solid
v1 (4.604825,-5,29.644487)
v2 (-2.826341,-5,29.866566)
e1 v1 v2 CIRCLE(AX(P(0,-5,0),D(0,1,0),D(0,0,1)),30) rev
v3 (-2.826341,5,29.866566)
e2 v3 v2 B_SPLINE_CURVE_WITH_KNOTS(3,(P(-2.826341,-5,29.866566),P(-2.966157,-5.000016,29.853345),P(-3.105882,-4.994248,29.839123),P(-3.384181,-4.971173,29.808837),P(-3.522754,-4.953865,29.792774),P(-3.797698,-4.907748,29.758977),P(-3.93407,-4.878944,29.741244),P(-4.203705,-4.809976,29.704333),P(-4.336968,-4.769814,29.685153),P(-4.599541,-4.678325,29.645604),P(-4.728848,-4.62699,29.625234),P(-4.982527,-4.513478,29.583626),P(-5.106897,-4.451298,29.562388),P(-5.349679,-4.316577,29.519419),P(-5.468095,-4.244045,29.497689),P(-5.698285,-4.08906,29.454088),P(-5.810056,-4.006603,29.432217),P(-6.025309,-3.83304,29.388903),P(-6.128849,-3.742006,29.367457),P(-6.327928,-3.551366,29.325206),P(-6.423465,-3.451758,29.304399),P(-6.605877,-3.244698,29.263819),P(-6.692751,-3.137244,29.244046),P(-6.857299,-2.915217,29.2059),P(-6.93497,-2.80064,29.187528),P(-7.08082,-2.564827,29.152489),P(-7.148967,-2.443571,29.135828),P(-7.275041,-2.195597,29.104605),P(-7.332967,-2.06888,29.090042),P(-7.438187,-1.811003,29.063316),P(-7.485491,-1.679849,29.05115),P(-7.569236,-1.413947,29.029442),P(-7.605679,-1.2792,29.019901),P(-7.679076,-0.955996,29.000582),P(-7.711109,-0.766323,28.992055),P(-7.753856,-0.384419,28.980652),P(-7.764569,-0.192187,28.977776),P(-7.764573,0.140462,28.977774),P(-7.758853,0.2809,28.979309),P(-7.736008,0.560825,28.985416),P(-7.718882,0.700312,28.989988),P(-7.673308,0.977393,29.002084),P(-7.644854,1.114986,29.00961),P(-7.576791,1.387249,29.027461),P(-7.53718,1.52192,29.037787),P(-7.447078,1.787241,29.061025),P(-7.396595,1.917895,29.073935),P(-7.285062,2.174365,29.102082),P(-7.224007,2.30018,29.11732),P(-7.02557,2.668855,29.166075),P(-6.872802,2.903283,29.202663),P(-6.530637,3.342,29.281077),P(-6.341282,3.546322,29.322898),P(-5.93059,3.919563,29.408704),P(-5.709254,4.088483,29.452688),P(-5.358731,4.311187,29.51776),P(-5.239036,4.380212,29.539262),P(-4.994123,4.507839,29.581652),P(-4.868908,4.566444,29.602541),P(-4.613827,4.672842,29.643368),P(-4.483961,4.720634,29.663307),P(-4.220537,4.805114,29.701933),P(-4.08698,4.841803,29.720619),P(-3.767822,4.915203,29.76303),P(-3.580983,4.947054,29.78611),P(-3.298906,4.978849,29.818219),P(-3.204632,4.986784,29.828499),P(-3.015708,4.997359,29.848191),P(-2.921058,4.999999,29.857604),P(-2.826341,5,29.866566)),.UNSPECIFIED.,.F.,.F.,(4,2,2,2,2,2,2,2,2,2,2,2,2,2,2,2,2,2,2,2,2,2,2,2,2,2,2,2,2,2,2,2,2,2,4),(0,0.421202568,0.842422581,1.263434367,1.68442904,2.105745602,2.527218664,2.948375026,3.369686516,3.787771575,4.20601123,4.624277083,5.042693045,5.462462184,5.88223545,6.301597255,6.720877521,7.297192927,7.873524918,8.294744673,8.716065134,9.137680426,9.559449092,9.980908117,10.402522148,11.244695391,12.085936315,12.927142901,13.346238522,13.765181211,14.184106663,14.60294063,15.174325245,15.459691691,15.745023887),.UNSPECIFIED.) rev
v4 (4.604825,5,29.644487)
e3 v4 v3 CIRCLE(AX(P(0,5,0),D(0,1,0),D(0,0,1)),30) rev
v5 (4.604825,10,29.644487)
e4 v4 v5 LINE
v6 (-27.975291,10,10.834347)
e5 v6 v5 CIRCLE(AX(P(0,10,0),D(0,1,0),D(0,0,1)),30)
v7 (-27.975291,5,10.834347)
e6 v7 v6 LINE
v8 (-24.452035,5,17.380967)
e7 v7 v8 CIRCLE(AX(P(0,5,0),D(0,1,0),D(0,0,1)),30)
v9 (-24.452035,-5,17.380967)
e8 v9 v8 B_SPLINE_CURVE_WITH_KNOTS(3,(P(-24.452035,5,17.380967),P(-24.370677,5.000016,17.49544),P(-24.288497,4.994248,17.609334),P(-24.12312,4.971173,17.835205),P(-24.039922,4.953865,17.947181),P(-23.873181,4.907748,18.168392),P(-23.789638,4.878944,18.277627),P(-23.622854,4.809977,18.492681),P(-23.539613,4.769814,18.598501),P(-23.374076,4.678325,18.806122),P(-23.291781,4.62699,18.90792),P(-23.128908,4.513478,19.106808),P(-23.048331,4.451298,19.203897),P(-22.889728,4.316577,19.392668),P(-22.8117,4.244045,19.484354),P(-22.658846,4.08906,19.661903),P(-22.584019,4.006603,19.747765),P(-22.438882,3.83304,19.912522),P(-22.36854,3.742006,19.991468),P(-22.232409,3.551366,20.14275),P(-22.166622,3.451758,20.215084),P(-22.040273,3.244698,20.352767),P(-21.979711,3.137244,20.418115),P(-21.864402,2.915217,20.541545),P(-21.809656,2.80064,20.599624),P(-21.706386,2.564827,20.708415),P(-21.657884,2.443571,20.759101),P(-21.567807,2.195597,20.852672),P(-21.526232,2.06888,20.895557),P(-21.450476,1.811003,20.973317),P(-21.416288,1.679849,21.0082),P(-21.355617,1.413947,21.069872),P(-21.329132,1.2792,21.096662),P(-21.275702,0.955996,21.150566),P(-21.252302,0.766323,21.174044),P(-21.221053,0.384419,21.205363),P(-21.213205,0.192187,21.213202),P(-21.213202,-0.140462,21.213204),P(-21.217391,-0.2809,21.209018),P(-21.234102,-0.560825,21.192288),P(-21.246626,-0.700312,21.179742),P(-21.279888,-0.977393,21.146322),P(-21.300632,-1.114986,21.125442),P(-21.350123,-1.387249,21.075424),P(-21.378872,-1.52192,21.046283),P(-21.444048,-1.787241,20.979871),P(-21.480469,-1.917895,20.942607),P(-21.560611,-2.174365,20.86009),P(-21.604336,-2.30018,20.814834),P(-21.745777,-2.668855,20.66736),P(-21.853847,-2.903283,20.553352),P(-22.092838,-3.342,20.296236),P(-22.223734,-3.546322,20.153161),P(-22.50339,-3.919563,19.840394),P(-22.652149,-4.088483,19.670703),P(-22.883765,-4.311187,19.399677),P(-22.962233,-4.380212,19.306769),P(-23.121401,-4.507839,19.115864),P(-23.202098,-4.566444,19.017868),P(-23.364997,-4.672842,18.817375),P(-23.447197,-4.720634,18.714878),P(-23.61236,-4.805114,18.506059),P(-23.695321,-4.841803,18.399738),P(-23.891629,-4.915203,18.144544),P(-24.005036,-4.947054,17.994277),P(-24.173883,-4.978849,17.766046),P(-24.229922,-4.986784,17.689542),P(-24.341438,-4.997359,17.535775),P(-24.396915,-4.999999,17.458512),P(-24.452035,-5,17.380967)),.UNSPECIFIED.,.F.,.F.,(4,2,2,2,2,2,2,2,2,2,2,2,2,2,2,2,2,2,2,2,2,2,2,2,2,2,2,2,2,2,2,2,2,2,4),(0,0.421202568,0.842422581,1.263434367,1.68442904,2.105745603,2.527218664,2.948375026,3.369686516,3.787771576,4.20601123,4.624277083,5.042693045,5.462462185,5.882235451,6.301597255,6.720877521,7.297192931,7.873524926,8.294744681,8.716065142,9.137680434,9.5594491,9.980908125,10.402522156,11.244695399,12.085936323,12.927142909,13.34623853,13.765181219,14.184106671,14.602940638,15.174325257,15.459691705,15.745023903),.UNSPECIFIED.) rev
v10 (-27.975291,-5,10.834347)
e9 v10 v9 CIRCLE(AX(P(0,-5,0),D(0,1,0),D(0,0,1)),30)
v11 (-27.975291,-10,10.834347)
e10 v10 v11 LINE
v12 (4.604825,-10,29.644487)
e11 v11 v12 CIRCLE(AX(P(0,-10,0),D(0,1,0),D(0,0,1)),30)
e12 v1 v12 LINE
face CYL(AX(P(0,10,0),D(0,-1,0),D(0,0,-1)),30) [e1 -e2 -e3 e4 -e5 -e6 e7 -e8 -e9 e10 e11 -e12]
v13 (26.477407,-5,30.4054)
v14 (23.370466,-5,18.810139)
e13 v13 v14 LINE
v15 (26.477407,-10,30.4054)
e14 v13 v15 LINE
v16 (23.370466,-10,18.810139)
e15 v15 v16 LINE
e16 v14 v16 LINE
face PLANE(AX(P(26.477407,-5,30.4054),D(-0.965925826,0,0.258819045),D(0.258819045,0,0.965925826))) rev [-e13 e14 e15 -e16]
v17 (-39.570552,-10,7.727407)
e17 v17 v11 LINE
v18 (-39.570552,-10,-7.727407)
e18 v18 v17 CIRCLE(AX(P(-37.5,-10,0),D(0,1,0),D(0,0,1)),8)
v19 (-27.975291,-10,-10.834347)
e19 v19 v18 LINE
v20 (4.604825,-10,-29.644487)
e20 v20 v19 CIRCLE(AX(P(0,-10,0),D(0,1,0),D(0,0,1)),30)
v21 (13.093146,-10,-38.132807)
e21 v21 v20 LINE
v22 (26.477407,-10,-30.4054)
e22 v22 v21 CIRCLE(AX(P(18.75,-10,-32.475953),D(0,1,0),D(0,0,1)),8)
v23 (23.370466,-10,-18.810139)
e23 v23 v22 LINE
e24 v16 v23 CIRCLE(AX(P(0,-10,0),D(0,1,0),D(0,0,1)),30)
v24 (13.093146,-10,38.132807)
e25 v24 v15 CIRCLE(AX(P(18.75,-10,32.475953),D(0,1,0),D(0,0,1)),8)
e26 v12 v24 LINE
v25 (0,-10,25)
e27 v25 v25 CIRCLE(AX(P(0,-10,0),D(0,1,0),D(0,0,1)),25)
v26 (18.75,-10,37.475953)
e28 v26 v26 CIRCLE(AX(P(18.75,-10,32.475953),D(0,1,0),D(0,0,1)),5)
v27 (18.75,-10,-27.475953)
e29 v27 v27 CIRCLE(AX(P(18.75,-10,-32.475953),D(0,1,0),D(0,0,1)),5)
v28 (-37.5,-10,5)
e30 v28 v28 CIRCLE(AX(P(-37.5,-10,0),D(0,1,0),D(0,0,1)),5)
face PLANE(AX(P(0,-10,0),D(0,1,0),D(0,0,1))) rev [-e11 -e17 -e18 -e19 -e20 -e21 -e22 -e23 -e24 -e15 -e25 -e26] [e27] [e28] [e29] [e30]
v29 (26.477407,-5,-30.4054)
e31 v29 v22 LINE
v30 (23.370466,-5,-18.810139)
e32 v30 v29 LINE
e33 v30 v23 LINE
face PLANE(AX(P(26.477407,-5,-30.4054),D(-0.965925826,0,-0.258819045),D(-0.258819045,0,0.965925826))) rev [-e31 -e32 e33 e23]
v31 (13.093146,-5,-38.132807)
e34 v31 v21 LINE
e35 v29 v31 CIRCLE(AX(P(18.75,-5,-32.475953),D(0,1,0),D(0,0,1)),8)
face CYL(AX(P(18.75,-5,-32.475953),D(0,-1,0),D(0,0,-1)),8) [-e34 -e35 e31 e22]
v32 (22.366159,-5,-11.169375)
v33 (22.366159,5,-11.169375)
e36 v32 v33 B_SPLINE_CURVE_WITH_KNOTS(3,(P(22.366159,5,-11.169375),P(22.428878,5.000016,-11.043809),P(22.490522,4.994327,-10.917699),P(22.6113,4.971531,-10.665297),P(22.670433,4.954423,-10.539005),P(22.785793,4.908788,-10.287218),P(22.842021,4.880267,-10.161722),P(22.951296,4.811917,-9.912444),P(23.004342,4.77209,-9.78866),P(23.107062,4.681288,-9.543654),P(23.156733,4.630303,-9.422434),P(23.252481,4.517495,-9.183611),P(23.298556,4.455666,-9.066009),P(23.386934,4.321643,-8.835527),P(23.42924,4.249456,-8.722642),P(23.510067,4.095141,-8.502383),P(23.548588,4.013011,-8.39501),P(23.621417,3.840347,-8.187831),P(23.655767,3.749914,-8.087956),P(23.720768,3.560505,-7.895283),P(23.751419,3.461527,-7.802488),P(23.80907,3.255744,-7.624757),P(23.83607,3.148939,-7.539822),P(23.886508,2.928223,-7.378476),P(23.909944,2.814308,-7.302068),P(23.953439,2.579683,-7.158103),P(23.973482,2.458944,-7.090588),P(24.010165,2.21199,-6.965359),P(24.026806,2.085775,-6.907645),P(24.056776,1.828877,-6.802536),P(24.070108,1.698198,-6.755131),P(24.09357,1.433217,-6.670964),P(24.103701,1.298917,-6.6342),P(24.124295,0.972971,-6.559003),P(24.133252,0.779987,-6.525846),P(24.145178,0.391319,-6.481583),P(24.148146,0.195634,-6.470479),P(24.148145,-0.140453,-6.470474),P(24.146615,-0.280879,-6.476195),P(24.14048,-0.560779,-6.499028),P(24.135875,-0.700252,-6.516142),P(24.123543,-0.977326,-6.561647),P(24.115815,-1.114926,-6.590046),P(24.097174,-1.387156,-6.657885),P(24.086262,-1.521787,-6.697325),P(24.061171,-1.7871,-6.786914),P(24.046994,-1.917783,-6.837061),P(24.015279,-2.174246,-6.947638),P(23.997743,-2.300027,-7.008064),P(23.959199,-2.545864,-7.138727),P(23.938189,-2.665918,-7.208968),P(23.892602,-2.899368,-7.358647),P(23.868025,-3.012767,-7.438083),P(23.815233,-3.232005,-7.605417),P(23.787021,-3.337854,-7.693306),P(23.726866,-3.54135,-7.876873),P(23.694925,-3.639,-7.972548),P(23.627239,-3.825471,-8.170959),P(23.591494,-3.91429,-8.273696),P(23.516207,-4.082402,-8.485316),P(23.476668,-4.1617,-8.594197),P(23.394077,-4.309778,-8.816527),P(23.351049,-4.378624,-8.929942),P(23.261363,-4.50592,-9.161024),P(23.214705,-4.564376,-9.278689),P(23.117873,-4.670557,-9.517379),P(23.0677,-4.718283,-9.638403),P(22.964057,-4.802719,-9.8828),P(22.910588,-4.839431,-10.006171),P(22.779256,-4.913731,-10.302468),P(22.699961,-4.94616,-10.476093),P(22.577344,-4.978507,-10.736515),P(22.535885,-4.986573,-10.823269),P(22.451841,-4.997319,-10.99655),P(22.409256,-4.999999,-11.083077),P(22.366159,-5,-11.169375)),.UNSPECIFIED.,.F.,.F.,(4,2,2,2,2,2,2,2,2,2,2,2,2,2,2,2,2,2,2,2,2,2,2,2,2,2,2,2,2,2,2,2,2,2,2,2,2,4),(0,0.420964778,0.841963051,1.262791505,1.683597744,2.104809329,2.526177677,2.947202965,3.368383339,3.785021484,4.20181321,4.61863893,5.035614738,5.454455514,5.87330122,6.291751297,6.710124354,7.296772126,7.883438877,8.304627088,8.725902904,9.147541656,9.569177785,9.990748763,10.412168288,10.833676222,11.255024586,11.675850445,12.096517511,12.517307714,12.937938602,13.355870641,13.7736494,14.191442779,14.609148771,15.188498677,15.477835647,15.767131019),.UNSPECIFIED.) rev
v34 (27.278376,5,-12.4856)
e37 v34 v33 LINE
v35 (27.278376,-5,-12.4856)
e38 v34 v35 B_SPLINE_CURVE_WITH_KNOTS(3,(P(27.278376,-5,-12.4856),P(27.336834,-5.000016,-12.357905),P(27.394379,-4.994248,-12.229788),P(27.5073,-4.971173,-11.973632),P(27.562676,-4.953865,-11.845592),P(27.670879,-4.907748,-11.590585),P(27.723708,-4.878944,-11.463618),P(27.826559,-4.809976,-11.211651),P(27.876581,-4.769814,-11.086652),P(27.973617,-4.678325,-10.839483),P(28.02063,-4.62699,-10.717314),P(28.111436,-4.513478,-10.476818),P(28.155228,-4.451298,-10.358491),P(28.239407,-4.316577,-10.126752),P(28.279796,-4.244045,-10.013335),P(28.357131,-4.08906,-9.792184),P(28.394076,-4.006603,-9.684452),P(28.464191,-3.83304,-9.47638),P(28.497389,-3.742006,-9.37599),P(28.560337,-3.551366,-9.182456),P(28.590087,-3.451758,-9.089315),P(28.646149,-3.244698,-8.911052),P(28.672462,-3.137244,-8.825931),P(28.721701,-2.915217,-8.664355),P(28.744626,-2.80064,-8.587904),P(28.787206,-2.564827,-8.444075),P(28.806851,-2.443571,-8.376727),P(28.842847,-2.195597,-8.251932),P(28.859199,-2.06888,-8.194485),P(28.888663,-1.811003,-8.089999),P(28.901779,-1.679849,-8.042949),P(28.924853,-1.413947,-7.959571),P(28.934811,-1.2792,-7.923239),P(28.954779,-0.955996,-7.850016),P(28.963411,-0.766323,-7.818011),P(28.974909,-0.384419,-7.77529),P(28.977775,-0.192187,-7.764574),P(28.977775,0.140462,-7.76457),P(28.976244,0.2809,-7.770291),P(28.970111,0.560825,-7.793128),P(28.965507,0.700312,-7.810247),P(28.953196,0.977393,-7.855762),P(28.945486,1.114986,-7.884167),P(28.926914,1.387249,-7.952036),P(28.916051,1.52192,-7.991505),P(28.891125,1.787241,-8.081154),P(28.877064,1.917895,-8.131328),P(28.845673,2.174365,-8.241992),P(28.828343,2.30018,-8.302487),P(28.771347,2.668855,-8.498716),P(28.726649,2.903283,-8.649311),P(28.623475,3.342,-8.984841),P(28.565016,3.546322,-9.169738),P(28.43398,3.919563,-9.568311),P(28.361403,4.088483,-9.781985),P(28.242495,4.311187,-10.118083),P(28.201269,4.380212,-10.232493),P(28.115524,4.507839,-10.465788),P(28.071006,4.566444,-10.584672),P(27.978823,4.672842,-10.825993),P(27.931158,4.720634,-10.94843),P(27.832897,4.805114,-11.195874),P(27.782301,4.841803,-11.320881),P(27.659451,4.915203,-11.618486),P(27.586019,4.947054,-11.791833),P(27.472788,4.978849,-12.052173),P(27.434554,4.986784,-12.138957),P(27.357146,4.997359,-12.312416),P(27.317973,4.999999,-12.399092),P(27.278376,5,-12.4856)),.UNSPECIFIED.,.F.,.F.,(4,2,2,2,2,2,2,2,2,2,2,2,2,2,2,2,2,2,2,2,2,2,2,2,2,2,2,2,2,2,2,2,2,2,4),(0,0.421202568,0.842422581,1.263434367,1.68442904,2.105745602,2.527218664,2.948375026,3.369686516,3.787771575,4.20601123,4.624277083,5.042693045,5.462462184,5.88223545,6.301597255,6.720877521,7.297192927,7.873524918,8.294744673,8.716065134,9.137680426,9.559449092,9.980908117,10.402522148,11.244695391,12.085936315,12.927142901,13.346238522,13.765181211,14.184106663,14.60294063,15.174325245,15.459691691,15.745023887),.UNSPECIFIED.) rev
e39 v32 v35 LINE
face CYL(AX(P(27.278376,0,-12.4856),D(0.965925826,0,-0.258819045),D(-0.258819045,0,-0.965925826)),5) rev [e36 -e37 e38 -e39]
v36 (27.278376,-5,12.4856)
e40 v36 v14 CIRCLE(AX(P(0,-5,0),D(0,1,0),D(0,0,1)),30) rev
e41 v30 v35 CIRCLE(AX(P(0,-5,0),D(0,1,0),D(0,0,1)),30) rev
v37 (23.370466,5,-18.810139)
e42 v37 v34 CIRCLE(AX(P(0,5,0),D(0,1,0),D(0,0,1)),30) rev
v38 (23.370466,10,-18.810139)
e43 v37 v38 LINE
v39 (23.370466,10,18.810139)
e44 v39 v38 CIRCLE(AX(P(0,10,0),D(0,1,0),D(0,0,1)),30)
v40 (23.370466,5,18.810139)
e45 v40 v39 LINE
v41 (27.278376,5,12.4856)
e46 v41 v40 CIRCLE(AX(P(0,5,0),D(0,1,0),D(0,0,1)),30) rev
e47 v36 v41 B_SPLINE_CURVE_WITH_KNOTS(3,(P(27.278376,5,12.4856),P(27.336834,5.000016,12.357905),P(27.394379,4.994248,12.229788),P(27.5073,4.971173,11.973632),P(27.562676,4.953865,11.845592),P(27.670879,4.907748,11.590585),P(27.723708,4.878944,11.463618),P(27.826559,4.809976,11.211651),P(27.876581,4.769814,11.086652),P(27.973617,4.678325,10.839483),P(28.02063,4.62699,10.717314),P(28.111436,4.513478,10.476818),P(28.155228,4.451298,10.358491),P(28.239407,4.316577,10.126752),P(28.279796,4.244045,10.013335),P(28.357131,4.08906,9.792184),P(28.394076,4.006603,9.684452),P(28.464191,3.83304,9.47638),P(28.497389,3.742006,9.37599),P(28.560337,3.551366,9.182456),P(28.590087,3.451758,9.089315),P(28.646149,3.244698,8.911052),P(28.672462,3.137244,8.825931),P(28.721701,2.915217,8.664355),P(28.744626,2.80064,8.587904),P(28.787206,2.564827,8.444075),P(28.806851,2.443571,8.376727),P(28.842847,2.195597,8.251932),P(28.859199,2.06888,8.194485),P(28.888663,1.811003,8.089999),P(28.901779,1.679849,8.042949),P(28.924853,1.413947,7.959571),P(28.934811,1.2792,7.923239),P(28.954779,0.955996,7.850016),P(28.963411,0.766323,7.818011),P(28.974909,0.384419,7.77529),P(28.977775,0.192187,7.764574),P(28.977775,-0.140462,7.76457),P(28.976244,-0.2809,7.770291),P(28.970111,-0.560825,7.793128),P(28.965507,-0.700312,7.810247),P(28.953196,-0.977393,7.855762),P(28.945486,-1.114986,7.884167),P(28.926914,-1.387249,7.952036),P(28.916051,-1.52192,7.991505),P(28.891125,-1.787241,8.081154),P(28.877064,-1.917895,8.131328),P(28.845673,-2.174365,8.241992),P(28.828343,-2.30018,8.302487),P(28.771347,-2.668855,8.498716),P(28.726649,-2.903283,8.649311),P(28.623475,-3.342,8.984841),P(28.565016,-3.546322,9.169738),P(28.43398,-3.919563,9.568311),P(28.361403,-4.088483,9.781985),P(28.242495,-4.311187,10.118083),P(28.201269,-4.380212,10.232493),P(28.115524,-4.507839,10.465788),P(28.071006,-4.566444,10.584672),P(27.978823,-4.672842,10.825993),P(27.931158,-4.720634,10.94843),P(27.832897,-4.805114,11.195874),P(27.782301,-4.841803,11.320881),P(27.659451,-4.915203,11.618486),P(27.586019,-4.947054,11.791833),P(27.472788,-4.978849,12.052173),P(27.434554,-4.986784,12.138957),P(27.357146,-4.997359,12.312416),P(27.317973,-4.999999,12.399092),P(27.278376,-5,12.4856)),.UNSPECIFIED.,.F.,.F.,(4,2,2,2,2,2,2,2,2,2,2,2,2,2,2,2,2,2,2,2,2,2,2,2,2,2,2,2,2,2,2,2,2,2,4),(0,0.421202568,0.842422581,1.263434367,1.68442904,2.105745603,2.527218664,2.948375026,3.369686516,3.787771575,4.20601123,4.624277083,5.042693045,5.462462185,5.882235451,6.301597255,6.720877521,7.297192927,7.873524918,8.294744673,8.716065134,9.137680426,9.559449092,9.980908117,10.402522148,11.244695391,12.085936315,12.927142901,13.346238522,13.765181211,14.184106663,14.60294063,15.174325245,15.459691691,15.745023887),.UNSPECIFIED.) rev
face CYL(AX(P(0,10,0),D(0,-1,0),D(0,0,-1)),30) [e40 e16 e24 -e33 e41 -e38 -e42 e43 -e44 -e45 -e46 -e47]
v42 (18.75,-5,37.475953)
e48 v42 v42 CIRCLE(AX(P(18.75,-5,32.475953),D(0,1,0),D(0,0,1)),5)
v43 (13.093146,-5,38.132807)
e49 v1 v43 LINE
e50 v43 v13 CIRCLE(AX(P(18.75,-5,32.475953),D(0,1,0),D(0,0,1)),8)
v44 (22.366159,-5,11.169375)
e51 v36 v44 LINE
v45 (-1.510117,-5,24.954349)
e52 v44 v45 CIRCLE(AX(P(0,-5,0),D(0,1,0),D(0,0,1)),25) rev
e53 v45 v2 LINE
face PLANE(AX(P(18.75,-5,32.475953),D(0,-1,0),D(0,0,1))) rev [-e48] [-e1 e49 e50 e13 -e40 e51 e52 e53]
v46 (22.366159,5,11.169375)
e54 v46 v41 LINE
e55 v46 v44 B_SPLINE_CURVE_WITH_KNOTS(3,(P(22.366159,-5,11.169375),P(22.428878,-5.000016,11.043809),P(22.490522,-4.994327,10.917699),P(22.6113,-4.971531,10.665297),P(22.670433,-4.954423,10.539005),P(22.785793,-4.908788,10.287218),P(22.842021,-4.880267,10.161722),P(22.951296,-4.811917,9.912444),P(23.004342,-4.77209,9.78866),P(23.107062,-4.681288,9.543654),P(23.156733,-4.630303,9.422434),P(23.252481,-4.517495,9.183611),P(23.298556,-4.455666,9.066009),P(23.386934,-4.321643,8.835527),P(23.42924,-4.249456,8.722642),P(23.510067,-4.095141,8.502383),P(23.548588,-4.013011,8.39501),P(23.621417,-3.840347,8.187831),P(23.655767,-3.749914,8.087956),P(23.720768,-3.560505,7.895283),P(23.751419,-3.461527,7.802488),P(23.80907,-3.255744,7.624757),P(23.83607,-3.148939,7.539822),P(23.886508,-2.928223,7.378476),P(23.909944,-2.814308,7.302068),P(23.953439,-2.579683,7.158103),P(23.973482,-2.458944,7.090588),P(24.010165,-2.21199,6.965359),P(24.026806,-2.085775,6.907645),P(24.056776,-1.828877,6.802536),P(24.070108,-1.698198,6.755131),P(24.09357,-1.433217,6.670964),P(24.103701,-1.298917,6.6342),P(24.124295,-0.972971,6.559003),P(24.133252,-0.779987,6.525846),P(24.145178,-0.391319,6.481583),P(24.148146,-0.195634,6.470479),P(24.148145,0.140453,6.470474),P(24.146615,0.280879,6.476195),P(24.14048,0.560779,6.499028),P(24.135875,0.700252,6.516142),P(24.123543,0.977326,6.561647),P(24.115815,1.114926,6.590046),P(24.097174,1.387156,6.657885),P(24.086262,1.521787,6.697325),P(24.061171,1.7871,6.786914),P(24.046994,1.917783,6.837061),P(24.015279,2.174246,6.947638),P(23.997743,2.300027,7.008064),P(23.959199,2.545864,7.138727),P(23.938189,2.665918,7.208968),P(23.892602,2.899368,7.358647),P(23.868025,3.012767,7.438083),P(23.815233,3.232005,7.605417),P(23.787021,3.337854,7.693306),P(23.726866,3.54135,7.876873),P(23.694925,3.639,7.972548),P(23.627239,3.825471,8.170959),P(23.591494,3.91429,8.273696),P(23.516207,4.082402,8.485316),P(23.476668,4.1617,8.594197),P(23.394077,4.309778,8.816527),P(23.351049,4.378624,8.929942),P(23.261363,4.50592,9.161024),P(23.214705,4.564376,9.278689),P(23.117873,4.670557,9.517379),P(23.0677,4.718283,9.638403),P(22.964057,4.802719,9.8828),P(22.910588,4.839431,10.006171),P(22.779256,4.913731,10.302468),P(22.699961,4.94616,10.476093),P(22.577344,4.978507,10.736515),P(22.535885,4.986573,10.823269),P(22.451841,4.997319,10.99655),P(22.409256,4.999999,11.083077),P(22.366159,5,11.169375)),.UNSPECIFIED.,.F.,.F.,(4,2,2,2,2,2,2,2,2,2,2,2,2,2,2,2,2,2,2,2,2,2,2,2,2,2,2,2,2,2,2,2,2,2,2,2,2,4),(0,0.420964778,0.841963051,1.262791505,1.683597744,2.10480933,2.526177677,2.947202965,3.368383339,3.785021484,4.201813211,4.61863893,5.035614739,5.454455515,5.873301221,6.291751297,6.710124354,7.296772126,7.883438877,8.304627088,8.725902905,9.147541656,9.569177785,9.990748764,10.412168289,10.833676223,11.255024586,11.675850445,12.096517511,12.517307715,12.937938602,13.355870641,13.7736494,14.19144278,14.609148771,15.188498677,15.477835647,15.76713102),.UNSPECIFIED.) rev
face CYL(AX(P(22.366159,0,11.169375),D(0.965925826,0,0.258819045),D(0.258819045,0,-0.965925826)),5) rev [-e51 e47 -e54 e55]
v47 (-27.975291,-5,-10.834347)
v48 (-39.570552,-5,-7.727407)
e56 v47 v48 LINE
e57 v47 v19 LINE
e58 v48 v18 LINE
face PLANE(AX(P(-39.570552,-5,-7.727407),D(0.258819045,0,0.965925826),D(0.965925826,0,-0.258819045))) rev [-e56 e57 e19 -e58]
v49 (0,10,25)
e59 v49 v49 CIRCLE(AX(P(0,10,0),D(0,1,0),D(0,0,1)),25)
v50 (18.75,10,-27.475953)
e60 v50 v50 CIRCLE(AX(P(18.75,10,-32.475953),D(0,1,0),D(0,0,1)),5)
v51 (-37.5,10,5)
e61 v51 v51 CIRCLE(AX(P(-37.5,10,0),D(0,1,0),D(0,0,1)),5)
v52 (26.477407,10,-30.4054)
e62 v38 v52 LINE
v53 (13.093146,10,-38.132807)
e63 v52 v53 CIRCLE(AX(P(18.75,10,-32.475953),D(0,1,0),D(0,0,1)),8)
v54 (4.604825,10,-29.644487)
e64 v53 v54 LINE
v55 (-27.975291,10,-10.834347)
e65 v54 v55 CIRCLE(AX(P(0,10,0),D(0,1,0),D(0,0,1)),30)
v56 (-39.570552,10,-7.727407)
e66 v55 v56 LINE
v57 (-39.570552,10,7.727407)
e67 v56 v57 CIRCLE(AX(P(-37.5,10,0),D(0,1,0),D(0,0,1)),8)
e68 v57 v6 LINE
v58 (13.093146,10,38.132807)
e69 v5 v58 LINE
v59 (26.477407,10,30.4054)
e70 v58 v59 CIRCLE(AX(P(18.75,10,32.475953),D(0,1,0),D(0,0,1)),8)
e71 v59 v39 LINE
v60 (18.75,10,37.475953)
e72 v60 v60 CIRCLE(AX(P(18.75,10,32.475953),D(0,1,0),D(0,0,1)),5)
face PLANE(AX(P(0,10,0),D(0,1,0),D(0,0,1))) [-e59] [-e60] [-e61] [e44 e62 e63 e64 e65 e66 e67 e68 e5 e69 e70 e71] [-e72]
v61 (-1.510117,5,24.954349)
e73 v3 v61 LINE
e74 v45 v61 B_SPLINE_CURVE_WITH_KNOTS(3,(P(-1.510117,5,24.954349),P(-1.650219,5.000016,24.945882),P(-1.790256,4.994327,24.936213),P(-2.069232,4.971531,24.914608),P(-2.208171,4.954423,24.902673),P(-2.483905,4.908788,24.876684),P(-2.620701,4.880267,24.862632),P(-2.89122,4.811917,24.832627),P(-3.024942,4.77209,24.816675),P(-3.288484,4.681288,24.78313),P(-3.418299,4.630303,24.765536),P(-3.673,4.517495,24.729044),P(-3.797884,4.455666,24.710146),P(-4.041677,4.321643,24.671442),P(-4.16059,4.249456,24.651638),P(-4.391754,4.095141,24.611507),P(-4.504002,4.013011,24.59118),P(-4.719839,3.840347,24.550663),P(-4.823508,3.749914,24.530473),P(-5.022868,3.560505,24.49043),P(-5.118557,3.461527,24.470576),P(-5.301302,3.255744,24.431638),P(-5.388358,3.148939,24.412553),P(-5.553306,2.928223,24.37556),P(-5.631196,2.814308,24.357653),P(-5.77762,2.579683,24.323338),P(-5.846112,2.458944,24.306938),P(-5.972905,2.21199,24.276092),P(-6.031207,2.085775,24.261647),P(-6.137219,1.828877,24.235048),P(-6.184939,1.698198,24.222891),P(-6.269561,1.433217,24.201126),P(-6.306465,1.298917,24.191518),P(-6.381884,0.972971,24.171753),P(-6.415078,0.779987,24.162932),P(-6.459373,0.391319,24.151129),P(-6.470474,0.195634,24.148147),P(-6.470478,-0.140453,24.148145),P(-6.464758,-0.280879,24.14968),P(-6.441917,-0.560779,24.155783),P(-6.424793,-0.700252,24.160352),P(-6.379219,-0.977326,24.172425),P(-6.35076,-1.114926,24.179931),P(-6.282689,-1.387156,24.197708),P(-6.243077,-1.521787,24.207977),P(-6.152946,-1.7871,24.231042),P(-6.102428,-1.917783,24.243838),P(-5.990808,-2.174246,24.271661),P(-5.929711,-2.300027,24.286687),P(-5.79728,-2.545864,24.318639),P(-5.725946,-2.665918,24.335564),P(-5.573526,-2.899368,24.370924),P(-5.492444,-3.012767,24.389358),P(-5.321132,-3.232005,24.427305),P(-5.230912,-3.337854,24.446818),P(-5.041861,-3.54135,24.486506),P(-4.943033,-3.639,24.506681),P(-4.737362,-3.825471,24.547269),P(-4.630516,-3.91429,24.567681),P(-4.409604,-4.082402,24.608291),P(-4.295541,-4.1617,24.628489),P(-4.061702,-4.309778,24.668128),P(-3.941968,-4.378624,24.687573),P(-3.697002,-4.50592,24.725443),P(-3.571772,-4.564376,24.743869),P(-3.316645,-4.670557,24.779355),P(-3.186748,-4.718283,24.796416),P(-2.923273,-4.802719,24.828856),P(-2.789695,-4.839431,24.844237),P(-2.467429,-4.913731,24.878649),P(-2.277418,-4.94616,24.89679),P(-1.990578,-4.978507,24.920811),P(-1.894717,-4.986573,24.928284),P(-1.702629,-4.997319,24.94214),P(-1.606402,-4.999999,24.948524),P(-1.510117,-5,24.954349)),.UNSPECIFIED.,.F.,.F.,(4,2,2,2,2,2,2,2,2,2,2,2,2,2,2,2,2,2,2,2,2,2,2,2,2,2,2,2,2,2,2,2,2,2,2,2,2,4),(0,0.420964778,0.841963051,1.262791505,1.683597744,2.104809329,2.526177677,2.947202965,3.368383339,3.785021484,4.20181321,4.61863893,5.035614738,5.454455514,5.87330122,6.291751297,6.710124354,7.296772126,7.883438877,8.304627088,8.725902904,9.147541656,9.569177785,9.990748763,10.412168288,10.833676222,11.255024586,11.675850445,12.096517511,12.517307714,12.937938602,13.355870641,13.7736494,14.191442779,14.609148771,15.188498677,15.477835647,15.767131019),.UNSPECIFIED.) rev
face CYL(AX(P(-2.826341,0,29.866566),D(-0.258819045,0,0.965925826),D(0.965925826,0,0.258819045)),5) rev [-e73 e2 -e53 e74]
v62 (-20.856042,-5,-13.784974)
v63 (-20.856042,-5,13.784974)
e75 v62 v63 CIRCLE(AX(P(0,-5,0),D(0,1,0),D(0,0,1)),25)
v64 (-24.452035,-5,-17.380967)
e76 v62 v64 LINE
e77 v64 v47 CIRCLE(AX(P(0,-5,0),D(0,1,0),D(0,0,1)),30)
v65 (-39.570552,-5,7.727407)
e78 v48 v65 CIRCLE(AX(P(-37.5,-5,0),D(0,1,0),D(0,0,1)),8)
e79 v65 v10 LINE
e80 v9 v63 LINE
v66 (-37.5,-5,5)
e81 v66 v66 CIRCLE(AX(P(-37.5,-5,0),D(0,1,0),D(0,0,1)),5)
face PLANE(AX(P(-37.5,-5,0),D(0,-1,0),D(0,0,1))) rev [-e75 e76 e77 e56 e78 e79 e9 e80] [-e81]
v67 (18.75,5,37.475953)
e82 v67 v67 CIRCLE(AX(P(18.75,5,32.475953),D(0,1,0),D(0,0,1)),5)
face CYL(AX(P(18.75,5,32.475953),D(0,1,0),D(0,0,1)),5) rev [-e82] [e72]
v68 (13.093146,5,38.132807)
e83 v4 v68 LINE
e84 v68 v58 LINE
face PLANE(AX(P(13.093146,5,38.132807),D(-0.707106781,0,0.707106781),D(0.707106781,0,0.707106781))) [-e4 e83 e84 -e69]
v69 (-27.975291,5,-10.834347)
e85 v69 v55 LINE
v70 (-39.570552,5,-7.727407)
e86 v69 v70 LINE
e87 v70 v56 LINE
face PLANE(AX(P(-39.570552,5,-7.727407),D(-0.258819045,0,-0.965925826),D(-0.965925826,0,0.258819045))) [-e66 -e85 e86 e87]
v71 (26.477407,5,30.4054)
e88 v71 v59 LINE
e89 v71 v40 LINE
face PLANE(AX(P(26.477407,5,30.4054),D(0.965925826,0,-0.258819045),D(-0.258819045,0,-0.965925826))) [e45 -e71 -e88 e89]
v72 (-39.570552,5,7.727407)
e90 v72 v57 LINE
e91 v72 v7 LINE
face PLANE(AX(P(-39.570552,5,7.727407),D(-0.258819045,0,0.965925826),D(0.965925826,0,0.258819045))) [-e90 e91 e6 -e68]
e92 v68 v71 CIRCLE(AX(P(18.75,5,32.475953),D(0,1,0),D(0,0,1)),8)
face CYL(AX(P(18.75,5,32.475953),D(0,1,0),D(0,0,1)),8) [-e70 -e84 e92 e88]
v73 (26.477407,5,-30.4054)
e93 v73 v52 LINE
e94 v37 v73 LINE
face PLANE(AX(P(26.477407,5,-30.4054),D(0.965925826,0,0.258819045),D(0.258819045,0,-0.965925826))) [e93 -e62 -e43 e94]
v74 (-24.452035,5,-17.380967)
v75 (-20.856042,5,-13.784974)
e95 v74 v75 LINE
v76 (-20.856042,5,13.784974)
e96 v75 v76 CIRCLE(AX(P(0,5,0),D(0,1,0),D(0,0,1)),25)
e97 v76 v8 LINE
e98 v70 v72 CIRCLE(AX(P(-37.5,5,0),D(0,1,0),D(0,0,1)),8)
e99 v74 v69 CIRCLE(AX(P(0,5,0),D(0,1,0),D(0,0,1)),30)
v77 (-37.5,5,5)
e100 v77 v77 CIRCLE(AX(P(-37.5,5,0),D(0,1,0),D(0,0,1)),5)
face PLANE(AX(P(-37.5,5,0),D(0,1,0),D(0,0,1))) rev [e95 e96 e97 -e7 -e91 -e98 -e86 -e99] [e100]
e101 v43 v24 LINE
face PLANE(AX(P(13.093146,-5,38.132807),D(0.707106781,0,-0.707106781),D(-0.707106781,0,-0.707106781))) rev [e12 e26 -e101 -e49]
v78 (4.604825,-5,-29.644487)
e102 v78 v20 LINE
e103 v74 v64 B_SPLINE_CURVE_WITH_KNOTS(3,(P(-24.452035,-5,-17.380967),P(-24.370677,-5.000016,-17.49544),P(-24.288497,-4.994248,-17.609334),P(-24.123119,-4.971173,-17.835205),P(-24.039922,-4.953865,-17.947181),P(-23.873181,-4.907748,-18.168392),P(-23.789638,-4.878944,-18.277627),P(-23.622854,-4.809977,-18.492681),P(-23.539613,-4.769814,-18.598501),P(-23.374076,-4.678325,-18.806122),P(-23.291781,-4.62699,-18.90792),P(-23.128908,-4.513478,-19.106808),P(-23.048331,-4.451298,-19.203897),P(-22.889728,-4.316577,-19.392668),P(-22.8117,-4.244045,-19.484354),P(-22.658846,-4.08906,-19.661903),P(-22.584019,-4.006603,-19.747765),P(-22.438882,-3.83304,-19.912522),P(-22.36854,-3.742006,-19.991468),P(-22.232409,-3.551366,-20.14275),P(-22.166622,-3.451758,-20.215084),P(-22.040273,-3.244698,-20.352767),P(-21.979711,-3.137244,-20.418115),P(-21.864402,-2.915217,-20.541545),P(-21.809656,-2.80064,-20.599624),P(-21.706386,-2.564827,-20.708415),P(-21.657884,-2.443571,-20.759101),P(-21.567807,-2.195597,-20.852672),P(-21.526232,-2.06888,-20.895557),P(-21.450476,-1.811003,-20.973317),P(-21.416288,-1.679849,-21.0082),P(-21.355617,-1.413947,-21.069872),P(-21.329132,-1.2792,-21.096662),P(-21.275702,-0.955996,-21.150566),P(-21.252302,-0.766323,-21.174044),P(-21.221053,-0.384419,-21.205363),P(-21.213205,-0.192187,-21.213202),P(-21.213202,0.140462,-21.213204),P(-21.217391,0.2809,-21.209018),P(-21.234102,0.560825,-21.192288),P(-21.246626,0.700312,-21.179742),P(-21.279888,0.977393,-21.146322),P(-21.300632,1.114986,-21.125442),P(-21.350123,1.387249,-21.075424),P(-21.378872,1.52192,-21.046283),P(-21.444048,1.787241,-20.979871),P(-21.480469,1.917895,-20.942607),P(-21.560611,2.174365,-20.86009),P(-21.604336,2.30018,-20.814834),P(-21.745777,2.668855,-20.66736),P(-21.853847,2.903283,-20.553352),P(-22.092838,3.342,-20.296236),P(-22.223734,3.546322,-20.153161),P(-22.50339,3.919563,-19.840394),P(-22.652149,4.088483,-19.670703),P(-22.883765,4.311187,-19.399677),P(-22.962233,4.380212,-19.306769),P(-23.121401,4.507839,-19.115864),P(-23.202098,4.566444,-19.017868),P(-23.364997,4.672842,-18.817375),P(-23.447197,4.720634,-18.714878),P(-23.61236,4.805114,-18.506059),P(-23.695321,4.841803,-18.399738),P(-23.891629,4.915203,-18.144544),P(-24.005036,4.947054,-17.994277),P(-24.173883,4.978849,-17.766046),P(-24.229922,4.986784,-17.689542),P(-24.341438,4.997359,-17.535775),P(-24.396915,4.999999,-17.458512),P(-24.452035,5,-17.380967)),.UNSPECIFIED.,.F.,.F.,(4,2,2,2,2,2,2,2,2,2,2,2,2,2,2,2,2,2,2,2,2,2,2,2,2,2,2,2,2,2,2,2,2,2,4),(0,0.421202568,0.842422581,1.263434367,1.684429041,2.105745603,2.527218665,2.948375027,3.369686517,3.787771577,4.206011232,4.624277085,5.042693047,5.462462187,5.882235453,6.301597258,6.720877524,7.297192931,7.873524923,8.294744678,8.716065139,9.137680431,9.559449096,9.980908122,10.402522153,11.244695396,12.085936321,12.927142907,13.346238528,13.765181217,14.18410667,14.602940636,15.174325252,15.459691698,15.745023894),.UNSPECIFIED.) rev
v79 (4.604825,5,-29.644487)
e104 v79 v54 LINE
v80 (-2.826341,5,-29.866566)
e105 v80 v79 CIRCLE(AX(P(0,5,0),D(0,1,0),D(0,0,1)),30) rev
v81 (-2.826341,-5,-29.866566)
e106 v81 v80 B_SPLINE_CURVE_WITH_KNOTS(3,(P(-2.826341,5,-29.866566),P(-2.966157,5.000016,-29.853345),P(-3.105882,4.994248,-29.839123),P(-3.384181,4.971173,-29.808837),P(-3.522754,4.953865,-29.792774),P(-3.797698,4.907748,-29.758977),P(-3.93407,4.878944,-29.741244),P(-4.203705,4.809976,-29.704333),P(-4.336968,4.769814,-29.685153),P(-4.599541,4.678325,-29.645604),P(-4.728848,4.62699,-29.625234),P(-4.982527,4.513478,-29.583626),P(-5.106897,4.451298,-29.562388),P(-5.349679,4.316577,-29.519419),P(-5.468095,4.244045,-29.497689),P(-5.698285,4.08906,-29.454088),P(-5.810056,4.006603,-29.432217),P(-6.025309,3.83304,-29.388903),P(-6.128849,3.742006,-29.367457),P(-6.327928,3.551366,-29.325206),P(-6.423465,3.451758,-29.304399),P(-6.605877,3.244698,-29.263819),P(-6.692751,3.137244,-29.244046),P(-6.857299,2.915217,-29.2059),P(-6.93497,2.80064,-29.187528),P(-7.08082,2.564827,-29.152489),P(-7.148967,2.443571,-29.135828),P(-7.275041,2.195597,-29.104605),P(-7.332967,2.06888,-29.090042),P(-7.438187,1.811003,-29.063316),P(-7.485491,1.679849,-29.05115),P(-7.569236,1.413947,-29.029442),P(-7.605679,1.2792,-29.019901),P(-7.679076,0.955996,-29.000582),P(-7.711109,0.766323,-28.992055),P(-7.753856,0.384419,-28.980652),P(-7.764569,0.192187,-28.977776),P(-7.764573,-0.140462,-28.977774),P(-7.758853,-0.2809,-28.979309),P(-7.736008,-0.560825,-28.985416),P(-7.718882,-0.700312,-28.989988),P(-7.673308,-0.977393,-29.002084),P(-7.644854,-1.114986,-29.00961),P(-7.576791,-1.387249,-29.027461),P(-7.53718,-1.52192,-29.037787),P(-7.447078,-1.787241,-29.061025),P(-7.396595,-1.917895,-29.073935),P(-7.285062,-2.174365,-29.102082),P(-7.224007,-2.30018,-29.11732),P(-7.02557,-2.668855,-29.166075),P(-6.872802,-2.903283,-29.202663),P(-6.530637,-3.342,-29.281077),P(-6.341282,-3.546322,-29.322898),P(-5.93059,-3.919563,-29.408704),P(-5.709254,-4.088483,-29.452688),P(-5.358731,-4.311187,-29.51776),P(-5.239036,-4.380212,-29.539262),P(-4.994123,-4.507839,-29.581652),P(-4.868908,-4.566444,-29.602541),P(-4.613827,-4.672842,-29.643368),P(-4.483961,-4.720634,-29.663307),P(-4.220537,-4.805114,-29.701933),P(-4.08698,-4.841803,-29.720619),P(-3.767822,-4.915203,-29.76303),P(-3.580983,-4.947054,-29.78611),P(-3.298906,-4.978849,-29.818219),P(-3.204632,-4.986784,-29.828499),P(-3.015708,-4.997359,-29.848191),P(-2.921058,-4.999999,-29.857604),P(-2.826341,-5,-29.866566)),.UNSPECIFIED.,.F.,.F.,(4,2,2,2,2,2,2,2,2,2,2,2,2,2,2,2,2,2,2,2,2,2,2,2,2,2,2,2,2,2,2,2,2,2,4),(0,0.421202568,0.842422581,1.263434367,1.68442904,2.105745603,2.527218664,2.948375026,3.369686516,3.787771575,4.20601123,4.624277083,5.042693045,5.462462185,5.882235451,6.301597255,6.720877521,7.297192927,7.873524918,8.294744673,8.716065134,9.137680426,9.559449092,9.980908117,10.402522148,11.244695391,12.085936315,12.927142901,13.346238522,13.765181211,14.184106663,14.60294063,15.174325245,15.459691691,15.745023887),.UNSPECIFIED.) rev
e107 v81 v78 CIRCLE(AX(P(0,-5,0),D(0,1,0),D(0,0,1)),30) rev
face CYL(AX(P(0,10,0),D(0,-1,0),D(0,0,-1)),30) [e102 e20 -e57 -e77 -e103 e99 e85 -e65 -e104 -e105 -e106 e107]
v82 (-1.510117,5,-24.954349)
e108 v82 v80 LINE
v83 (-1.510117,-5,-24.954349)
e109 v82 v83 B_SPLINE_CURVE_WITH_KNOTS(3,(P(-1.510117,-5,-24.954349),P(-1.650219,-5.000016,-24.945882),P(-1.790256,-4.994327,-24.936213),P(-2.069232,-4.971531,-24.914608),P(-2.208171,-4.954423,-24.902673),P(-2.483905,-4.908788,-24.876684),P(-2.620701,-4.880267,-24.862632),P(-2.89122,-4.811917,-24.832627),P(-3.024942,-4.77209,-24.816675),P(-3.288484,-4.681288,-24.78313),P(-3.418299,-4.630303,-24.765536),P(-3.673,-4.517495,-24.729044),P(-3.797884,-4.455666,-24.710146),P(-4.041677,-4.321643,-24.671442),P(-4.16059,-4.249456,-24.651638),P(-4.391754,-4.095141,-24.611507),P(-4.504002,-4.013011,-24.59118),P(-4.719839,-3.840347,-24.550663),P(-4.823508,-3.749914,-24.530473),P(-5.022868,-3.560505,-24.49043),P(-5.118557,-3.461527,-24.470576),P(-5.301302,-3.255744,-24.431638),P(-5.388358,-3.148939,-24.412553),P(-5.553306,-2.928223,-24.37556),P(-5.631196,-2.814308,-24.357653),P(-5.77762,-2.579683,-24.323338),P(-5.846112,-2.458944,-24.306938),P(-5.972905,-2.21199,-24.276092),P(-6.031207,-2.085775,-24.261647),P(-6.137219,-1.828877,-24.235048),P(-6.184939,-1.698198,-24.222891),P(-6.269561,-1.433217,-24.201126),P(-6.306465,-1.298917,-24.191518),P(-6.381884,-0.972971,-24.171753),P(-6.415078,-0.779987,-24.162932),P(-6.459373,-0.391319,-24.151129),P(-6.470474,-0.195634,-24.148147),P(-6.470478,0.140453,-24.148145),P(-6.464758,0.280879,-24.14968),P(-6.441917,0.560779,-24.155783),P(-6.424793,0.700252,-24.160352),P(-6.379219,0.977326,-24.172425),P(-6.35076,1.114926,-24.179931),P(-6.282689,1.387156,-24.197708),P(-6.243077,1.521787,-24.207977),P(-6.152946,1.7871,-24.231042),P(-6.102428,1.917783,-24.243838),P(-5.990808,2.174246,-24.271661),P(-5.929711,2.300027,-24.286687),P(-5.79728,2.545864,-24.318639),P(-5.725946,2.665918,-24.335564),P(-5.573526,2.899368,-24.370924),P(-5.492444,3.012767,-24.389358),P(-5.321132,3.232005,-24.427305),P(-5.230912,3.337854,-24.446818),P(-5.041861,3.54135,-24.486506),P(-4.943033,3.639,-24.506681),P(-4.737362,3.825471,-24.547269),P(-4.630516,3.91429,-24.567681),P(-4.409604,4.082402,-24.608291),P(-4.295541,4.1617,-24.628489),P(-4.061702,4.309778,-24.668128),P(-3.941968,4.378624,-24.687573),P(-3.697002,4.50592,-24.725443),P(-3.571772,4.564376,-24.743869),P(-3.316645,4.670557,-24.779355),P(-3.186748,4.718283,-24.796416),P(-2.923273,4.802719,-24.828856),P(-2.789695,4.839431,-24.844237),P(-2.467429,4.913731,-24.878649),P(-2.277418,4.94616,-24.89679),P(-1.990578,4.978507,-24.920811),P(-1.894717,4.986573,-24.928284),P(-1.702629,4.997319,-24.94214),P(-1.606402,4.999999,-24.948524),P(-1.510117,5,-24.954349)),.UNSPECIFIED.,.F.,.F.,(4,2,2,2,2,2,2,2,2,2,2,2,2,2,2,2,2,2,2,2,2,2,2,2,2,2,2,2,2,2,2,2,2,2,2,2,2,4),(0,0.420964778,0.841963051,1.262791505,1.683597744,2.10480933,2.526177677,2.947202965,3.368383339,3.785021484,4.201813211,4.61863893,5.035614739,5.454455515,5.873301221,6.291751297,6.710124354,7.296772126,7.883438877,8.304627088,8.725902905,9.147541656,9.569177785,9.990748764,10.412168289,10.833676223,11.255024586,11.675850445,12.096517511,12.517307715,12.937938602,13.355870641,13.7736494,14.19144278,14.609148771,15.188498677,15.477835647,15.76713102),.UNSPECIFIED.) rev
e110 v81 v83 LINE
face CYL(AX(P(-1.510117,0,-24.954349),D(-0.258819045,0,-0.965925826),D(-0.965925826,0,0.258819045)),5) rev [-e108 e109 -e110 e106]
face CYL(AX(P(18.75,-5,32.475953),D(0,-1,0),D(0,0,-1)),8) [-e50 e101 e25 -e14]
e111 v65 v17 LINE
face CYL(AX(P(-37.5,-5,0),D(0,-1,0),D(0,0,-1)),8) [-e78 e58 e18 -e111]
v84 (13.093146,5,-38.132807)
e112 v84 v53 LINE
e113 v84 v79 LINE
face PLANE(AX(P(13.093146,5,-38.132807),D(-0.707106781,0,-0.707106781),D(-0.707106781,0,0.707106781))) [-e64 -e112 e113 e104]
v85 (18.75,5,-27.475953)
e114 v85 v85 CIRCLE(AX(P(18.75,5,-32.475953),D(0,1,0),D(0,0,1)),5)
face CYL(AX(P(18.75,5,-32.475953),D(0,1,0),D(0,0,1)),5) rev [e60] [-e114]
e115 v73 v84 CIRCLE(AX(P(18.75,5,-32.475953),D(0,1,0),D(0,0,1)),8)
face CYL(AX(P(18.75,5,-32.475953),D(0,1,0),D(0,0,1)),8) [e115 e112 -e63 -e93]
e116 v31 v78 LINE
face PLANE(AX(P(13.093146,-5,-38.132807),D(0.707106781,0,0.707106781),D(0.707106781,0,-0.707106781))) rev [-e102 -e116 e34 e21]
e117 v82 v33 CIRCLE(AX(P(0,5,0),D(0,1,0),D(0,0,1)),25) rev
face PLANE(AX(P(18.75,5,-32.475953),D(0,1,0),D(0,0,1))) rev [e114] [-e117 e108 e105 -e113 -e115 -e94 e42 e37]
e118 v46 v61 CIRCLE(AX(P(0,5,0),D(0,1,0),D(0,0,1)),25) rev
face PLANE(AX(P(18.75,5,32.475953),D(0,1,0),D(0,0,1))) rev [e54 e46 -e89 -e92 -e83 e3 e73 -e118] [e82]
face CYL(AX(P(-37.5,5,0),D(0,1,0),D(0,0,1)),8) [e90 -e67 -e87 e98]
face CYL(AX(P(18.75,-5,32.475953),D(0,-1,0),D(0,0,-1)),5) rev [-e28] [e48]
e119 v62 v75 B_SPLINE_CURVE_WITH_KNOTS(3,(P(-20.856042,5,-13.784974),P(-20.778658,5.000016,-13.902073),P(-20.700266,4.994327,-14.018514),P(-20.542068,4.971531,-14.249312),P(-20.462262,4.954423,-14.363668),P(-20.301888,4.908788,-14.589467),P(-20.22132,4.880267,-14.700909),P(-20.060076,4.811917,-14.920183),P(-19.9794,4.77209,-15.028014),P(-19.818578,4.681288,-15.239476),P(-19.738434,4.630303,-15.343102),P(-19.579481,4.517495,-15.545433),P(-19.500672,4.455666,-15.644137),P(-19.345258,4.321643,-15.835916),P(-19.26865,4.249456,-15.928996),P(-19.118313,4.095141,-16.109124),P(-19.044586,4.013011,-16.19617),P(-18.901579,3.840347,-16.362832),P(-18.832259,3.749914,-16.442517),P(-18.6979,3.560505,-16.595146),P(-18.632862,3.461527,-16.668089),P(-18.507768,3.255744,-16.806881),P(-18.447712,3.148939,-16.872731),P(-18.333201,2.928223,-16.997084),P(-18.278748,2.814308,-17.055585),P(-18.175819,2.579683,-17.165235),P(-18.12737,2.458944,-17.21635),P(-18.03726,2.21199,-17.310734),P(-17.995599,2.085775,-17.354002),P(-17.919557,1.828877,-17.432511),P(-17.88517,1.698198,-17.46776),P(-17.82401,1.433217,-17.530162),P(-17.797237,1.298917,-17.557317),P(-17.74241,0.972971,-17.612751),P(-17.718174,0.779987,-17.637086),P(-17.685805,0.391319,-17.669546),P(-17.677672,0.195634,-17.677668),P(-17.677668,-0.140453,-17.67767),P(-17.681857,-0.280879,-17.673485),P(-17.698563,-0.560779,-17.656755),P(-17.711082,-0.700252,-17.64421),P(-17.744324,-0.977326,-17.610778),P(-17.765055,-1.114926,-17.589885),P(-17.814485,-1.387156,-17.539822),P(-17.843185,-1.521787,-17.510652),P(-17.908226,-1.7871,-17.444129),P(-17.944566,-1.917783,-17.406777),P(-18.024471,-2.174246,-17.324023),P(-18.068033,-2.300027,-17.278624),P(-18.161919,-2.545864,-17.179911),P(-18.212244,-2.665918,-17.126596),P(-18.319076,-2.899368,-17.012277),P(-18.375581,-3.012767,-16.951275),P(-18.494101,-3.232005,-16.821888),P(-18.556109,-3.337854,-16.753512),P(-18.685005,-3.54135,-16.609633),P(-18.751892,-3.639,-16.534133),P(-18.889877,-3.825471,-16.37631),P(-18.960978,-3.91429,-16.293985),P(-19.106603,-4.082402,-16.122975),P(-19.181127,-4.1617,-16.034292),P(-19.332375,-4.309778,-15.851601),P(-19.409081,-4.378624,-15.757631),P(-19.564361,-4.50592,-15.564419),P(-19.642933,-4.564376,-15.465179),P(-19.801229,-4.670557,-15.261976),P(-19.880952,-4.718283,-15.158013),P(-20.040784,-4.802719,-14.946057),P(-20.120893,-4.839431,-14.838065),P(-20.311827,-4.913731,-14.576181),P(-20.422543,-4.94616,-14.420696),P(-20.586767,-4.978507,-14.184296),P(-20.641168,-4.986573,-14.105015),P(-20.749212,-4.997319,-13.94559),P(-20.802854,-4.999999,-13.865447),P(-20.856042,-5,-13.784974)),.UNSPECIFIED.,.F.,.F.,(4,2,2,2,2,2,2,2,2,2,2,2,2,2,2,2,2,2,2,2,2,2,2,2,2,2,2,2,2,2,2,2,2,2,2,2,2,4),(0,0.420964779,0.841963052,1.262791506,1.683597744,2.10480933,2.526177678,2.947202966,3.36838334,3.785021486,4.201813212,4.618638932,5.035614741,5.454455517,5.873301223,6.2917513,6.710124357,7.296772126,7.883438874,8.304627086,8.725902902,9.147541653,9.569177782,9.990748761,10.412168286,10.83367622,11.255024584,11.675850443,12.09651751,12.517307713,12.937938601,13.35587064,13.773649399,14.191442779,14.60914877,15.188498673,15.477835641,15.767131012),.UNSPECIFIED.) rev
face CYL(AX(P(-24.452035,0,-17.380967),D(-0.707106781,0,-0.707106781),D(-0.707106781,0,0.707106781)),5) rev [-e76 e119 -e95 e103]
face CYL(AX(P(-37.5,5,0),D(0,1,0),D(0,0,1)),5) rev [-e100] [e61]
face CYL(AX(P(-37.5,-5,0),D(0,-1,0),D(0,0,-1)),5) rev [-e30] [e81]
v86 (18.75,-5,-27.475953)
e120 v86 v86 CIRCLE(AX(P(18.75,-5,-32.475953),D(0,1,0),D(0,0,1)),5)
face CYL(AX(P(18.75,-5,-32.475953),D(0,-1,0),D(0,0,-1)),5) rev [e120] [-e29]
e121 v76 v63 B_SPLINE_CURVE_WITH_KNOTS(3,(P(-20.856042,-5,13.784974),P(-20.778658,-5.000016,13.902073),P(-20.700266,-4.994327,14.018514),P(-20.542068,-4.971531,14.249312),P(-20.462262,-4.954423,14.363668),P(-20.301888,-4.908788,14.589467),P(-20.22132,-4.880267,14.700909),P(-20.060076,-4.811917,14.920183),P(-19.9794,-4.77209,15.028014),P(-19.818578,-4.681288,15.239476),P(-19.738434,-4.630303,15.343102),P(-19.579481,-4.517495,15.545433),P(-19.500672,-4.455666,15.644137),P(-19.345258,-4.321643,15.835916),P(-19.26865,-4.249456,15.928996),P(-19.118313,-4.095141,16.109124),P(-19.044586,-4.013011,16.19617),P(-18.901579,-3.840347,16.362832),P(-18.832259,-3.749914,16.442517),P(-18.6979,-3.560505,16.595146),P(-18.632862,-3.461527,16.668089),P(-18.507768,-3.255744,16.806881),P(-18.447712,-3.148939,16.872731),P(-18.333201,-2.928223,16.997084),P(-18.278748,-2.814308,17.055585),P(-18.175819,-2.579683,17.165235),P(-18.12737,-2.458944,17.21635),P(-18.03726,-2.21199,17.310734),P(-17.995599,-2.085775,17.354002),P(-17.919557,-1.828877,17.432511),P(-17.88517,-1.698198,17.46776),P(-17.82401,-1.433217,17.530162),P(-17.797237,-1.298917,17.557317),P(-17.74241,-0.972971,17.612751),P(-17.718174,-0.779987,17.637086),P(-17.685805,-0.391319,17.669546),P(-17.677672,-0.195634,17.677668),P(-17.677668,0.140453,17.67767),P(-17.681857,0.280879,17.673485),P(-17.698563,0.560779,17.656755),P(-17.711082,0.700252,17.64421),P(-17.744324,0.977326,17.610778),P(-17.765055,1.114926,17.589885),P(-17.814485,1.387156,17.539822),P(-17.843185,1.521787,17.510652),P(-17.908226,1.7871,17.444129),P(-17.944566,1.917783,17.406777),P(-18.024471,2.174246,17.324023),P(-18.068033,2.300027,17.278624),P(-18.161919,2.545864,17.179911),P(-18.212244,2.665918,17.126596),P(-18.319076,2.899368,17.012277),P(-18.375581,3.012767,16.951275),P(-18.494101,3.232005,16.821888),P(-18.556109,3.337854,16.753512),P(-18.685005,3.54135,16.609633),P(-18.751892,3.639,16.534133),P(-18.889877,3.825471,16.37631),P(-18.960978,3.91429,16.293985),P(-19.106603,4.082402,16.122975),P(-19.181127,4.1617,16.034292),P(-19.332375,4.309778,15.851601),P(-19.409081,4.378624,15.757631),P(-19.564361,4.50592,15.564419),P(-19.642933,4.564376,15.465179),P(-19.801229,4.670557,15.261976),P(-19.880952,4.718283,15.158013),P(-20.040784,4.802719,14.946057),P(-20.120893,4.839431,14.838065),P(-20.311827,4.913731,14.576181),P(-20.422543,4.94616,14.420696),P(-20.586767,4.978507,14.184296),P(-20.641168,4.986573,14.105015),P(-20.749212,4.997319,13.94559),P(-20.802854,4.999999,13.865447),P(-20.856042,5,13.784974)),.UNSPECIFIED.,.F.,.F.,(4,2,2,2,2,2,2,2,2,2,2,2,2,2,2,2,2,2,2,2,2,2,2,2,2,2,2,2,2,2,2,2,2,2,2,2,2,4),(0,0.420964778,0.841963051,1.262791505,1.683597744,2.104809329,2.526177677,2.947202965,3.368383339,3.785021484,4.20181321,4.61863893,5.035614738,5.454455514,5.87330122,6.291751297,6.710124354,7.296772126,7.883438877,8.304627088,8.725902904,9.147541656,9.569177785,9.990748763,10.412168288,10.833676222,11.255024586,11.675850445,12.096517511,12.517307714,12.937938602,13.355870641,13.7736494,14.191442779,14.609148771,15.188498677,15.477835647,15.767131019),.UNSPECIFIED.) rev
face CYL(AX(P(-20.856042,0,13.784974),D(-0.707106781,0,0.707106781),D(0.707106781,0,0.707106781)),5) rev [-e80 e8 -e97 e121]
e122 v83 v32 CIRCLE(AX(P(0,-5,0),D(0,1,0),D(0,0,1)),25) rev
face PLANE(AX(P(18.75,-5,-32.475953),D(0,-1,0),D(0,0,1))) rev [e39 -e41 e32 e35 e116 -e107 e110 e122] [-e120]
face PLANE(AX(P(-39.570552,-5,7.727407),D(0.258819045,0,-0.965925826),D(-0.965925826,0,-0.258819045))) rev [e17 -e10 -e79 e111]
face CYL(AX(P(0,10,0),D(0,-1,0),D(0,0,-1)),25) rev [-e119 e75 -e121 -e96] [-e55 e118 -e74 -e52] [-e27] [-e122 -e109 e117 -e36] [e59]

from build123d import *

# Parameters (mm, degrees)
SKETCH1_R           = 30
SKETCH1_R_2         = 25
BOSS_EXTRUDE1_DEPTH = 10
SKETCH3_R           = 5
BOSS_EXTRUDE2_DEPTH = 5
CUT_EXTRUDE1_DEPTH  = 5
FILLET3_R           = 5
FILLET4_R           = 5
FILLET5_R           = 5
FILLET6_R           = 5
FILLET7_R           = 5
FILLET8_R           = 5


with BuildPart() as part:
    # Sketch1 → Boss-Extrude1 (new, symmetric)
    with BuildSketch(Plane(origin=(0, 0, 0), x_dir=(1, 0, 0), z_dir=(0, 1, 0))):
        with Locations(Location((0, 0, 0), (0, 0, 270))):
            Circle(SKETCH1_R)
        with Locations(Location((0, 0, 0), (0, 0, 270))):
            Circle(SKETCH1_R_2, mode=Mode.SUBTRACT)
    extrude(amount=BOSS_EXTRUDE1_DEPTH, both=True)

    # Sketch3 → Boss-Extrude2 (add)
    # profile 1 of 3: a face of its own
    with BuildSketch(Plane(origin=(0, 10, 0), x_dir=(1, 0, 0), z_dir=(0, 1, 0))):
        with BuildLine():
            Line((-39.570552361, 7.72740661), (-27.975291142, 10.83434749))
            ThreePointArc((-27.975291142, 10.83434749), (-30, 0), (-27.975291142, -10.83434749))
            Line((-27.975291142, -10.83434749), (-39.570552361, -7.72740661))
            ThreePointArc((-39.570552361, -7.72740661), (-45.5, 0), (-39.570552361, 7.72740661))
        make_face()
        with Locations(Location((-37.5, 0, 0), (0, 0, 270))):
            Circle(SKETCH3_R, mode=Mode.SUBTRACT)
    # profile 2 of 3: a face of its own
    with BuildSketch(Plane(origin=(0, 10, 0), x_dir=(1, 0, 0), z_dir=(0, 1, 0))):
        with BuildLine():
            Line((26.47740661, 30.405400281), (23.370465731, 18.810139062))
            ThreePointArc((23.370465731, 18.810139062), (15, 25.980762114), (4.604825411, 29.644486552))
            Line((4.604825411, 29.644486552), (13.093145751, 38.132806891))
            ThreePointArc((13.093145751, 38.132806891), (22.75, 39.404155872), (26.47740661, 30.405400281))
        make_face()
        with Locations(Location((18.75, 32.475952642, 0), (0, 0, 270))):
            Circle(SKETCH3_R, mode=Mode.SUBTRACT)
    # profile 3 of 3: a face of its own
    with BuildSketch(Plane(origin=(0, 10, 0), x_dir=(1, 0, 0), z_dir=(0, 1, 0))):
        with BuildLine():
            Line((13.093145751, -38.132806891), (4.604825411, -29.644486552))
            ThreePointArc((4.604825411, -29.644486552), (15, -25.980762114), (23.370465731, -18.810139062))
            Line((23.370465731, -18.810139062), (26.47740661, -30.405400281))
            ThreePointArc((26.47740661, -30.405400281), (22.75, -39.404155872), (13.093145751, -38.132806891))
        make_face()
        with Locations(Location((18.75, -32.475952642, 0), (0, 0, 270))):
            Circle(SKETCH3_R, mode=Mode.SUBTRACT)
    boss_extrude2 = extrude(amount=-BOSS_EXTRUDE2_DEPTH)

    # Mirror1: Boss-Extrude2 across plane
    add(boss_extrude2.mirror(Plane.ZX))

    # Sketch4 → Cut-Extrude1 (cut, symmetric)
    with BuildSketch(Plane(origin=(0, 0, 0), x_dir=(1, 0, 0), z_dir=(0, 1, 0))):
        with BuildLine():
            ThreePointArc((-17.67766953, 17.67766953), (-25, 0), (-17.67766953, -17.67766953))
            Line((-17.67766953, -17.67766953), (-21.213203436, -21.213203436))
            ThreePointArc((-21.213203436, -21.213203436), (-30, 0), (-21.213203436, 21.213203436))
            Line((-21.213203436, 21.213203436), (-17.67766953, 17.67766953))
        make_face()
        with BuildLine():
            Line((24.148145657, -6.470476128), (28.977774789, -7.764571353))
            ThreePointArc((28.977774789, -7.764571353), (15, -25.980762114), (-7.764571353, -28.977774789))
            Line((-7.764571353, -28.977774789), (-6.470476128, -24.148145657))
            ThreePointArc((-6.470476128, -24.148145657), (12.5, -21.650635095), (24.148145657, -6.470476128))
        make_face()
        with BuildLine():
            Line((-6.470476128, 24.148145657), (-7.764571353, 28.977774789))
            ThreePointArc((-7.764571353, 28.977774789), (15, 25.980762114), (28.977774789, 7.764571353))
            Line((28.977774789, 7.764571353), (24.148145657, 6.470476128))
            ThreePointArc((24.148145657, 6.470476128), (12.5, 21.650635095), (-6.470476128, 24.148145657))
        make_face()
    extrude(amount=CUT_EXTRUDE1_DEPTH, both=True, mode=Mode.SUBTRACT)

    # Fillet3
    fillet3_edges = [part.edges().sort_by_distance(p)[0] for p in [
        (-19.445436483, -5, -19.445436483),
        (-19.445436483, 5, -19.445436483),
    ]]
    fillet(fillet3_edges, radius=FILLET3_R - 0.0001)  # a hair under: the kernel refuses the full size

    # Fillet4
    fillet4_edges = [part.edges().sort_by_distance(p)[0] for p in [
        (-19.445436483, 5, 19.445436483),
        (-19.445436483, -5, 19.445436483),
    ]]
    fillet(fillet4_edges, radius=FILLET4_R - 0.0001)  # a hair under: the kernel refuses the full size

    # Fillet5
    fillet5_edges = [part.edges().sort_by_distance(p)[0] for p in [
        (-7.11752374, -5, 26.562960223),
        (-7.11752374, 5, 26.562960223),
    ]]
    fillet(fillet5_edges, radius=FILLET5_R - 0.0001)  # a hair under: the kernel refuses the full size

    # Fillet6
    fillet6_edges = [part.edges().sort_by_distance(p)[0] for p in [
        (26.562960223, 5, 7.11752374),
        (26.562960223, -5, 7.11752374),
    ]]
    fillet(fillet6_edges, radius=FILLET6_R - 0.0001)  # a hair under: the kernel refuses the full size

    # Fillet7
    fillet7_edges = [part.edges().sort_by_distance(p)[0] for p in [
        (26.562960223, -5, -7.11752374),
        (26.562960223, 5, -7.11752374),
    ]]
    fillet(fillet7_edges, radius=FILLET7_R - 0.0001)  # a hair under: the kernel refuses the full size

    # Fillet8
    fillet8_edges = [part.edges().sort_by_distance(p)[0] for p in [
        (-7.11752374, 5, -26.562960223),
        (-7.11752374, -5, -26.562960223),
    ]]
    fillet(fillet8_edges, radius=FILLET8_R - 0.0001)  # a hair under: the kernel refuses the full size


solid = part.part
